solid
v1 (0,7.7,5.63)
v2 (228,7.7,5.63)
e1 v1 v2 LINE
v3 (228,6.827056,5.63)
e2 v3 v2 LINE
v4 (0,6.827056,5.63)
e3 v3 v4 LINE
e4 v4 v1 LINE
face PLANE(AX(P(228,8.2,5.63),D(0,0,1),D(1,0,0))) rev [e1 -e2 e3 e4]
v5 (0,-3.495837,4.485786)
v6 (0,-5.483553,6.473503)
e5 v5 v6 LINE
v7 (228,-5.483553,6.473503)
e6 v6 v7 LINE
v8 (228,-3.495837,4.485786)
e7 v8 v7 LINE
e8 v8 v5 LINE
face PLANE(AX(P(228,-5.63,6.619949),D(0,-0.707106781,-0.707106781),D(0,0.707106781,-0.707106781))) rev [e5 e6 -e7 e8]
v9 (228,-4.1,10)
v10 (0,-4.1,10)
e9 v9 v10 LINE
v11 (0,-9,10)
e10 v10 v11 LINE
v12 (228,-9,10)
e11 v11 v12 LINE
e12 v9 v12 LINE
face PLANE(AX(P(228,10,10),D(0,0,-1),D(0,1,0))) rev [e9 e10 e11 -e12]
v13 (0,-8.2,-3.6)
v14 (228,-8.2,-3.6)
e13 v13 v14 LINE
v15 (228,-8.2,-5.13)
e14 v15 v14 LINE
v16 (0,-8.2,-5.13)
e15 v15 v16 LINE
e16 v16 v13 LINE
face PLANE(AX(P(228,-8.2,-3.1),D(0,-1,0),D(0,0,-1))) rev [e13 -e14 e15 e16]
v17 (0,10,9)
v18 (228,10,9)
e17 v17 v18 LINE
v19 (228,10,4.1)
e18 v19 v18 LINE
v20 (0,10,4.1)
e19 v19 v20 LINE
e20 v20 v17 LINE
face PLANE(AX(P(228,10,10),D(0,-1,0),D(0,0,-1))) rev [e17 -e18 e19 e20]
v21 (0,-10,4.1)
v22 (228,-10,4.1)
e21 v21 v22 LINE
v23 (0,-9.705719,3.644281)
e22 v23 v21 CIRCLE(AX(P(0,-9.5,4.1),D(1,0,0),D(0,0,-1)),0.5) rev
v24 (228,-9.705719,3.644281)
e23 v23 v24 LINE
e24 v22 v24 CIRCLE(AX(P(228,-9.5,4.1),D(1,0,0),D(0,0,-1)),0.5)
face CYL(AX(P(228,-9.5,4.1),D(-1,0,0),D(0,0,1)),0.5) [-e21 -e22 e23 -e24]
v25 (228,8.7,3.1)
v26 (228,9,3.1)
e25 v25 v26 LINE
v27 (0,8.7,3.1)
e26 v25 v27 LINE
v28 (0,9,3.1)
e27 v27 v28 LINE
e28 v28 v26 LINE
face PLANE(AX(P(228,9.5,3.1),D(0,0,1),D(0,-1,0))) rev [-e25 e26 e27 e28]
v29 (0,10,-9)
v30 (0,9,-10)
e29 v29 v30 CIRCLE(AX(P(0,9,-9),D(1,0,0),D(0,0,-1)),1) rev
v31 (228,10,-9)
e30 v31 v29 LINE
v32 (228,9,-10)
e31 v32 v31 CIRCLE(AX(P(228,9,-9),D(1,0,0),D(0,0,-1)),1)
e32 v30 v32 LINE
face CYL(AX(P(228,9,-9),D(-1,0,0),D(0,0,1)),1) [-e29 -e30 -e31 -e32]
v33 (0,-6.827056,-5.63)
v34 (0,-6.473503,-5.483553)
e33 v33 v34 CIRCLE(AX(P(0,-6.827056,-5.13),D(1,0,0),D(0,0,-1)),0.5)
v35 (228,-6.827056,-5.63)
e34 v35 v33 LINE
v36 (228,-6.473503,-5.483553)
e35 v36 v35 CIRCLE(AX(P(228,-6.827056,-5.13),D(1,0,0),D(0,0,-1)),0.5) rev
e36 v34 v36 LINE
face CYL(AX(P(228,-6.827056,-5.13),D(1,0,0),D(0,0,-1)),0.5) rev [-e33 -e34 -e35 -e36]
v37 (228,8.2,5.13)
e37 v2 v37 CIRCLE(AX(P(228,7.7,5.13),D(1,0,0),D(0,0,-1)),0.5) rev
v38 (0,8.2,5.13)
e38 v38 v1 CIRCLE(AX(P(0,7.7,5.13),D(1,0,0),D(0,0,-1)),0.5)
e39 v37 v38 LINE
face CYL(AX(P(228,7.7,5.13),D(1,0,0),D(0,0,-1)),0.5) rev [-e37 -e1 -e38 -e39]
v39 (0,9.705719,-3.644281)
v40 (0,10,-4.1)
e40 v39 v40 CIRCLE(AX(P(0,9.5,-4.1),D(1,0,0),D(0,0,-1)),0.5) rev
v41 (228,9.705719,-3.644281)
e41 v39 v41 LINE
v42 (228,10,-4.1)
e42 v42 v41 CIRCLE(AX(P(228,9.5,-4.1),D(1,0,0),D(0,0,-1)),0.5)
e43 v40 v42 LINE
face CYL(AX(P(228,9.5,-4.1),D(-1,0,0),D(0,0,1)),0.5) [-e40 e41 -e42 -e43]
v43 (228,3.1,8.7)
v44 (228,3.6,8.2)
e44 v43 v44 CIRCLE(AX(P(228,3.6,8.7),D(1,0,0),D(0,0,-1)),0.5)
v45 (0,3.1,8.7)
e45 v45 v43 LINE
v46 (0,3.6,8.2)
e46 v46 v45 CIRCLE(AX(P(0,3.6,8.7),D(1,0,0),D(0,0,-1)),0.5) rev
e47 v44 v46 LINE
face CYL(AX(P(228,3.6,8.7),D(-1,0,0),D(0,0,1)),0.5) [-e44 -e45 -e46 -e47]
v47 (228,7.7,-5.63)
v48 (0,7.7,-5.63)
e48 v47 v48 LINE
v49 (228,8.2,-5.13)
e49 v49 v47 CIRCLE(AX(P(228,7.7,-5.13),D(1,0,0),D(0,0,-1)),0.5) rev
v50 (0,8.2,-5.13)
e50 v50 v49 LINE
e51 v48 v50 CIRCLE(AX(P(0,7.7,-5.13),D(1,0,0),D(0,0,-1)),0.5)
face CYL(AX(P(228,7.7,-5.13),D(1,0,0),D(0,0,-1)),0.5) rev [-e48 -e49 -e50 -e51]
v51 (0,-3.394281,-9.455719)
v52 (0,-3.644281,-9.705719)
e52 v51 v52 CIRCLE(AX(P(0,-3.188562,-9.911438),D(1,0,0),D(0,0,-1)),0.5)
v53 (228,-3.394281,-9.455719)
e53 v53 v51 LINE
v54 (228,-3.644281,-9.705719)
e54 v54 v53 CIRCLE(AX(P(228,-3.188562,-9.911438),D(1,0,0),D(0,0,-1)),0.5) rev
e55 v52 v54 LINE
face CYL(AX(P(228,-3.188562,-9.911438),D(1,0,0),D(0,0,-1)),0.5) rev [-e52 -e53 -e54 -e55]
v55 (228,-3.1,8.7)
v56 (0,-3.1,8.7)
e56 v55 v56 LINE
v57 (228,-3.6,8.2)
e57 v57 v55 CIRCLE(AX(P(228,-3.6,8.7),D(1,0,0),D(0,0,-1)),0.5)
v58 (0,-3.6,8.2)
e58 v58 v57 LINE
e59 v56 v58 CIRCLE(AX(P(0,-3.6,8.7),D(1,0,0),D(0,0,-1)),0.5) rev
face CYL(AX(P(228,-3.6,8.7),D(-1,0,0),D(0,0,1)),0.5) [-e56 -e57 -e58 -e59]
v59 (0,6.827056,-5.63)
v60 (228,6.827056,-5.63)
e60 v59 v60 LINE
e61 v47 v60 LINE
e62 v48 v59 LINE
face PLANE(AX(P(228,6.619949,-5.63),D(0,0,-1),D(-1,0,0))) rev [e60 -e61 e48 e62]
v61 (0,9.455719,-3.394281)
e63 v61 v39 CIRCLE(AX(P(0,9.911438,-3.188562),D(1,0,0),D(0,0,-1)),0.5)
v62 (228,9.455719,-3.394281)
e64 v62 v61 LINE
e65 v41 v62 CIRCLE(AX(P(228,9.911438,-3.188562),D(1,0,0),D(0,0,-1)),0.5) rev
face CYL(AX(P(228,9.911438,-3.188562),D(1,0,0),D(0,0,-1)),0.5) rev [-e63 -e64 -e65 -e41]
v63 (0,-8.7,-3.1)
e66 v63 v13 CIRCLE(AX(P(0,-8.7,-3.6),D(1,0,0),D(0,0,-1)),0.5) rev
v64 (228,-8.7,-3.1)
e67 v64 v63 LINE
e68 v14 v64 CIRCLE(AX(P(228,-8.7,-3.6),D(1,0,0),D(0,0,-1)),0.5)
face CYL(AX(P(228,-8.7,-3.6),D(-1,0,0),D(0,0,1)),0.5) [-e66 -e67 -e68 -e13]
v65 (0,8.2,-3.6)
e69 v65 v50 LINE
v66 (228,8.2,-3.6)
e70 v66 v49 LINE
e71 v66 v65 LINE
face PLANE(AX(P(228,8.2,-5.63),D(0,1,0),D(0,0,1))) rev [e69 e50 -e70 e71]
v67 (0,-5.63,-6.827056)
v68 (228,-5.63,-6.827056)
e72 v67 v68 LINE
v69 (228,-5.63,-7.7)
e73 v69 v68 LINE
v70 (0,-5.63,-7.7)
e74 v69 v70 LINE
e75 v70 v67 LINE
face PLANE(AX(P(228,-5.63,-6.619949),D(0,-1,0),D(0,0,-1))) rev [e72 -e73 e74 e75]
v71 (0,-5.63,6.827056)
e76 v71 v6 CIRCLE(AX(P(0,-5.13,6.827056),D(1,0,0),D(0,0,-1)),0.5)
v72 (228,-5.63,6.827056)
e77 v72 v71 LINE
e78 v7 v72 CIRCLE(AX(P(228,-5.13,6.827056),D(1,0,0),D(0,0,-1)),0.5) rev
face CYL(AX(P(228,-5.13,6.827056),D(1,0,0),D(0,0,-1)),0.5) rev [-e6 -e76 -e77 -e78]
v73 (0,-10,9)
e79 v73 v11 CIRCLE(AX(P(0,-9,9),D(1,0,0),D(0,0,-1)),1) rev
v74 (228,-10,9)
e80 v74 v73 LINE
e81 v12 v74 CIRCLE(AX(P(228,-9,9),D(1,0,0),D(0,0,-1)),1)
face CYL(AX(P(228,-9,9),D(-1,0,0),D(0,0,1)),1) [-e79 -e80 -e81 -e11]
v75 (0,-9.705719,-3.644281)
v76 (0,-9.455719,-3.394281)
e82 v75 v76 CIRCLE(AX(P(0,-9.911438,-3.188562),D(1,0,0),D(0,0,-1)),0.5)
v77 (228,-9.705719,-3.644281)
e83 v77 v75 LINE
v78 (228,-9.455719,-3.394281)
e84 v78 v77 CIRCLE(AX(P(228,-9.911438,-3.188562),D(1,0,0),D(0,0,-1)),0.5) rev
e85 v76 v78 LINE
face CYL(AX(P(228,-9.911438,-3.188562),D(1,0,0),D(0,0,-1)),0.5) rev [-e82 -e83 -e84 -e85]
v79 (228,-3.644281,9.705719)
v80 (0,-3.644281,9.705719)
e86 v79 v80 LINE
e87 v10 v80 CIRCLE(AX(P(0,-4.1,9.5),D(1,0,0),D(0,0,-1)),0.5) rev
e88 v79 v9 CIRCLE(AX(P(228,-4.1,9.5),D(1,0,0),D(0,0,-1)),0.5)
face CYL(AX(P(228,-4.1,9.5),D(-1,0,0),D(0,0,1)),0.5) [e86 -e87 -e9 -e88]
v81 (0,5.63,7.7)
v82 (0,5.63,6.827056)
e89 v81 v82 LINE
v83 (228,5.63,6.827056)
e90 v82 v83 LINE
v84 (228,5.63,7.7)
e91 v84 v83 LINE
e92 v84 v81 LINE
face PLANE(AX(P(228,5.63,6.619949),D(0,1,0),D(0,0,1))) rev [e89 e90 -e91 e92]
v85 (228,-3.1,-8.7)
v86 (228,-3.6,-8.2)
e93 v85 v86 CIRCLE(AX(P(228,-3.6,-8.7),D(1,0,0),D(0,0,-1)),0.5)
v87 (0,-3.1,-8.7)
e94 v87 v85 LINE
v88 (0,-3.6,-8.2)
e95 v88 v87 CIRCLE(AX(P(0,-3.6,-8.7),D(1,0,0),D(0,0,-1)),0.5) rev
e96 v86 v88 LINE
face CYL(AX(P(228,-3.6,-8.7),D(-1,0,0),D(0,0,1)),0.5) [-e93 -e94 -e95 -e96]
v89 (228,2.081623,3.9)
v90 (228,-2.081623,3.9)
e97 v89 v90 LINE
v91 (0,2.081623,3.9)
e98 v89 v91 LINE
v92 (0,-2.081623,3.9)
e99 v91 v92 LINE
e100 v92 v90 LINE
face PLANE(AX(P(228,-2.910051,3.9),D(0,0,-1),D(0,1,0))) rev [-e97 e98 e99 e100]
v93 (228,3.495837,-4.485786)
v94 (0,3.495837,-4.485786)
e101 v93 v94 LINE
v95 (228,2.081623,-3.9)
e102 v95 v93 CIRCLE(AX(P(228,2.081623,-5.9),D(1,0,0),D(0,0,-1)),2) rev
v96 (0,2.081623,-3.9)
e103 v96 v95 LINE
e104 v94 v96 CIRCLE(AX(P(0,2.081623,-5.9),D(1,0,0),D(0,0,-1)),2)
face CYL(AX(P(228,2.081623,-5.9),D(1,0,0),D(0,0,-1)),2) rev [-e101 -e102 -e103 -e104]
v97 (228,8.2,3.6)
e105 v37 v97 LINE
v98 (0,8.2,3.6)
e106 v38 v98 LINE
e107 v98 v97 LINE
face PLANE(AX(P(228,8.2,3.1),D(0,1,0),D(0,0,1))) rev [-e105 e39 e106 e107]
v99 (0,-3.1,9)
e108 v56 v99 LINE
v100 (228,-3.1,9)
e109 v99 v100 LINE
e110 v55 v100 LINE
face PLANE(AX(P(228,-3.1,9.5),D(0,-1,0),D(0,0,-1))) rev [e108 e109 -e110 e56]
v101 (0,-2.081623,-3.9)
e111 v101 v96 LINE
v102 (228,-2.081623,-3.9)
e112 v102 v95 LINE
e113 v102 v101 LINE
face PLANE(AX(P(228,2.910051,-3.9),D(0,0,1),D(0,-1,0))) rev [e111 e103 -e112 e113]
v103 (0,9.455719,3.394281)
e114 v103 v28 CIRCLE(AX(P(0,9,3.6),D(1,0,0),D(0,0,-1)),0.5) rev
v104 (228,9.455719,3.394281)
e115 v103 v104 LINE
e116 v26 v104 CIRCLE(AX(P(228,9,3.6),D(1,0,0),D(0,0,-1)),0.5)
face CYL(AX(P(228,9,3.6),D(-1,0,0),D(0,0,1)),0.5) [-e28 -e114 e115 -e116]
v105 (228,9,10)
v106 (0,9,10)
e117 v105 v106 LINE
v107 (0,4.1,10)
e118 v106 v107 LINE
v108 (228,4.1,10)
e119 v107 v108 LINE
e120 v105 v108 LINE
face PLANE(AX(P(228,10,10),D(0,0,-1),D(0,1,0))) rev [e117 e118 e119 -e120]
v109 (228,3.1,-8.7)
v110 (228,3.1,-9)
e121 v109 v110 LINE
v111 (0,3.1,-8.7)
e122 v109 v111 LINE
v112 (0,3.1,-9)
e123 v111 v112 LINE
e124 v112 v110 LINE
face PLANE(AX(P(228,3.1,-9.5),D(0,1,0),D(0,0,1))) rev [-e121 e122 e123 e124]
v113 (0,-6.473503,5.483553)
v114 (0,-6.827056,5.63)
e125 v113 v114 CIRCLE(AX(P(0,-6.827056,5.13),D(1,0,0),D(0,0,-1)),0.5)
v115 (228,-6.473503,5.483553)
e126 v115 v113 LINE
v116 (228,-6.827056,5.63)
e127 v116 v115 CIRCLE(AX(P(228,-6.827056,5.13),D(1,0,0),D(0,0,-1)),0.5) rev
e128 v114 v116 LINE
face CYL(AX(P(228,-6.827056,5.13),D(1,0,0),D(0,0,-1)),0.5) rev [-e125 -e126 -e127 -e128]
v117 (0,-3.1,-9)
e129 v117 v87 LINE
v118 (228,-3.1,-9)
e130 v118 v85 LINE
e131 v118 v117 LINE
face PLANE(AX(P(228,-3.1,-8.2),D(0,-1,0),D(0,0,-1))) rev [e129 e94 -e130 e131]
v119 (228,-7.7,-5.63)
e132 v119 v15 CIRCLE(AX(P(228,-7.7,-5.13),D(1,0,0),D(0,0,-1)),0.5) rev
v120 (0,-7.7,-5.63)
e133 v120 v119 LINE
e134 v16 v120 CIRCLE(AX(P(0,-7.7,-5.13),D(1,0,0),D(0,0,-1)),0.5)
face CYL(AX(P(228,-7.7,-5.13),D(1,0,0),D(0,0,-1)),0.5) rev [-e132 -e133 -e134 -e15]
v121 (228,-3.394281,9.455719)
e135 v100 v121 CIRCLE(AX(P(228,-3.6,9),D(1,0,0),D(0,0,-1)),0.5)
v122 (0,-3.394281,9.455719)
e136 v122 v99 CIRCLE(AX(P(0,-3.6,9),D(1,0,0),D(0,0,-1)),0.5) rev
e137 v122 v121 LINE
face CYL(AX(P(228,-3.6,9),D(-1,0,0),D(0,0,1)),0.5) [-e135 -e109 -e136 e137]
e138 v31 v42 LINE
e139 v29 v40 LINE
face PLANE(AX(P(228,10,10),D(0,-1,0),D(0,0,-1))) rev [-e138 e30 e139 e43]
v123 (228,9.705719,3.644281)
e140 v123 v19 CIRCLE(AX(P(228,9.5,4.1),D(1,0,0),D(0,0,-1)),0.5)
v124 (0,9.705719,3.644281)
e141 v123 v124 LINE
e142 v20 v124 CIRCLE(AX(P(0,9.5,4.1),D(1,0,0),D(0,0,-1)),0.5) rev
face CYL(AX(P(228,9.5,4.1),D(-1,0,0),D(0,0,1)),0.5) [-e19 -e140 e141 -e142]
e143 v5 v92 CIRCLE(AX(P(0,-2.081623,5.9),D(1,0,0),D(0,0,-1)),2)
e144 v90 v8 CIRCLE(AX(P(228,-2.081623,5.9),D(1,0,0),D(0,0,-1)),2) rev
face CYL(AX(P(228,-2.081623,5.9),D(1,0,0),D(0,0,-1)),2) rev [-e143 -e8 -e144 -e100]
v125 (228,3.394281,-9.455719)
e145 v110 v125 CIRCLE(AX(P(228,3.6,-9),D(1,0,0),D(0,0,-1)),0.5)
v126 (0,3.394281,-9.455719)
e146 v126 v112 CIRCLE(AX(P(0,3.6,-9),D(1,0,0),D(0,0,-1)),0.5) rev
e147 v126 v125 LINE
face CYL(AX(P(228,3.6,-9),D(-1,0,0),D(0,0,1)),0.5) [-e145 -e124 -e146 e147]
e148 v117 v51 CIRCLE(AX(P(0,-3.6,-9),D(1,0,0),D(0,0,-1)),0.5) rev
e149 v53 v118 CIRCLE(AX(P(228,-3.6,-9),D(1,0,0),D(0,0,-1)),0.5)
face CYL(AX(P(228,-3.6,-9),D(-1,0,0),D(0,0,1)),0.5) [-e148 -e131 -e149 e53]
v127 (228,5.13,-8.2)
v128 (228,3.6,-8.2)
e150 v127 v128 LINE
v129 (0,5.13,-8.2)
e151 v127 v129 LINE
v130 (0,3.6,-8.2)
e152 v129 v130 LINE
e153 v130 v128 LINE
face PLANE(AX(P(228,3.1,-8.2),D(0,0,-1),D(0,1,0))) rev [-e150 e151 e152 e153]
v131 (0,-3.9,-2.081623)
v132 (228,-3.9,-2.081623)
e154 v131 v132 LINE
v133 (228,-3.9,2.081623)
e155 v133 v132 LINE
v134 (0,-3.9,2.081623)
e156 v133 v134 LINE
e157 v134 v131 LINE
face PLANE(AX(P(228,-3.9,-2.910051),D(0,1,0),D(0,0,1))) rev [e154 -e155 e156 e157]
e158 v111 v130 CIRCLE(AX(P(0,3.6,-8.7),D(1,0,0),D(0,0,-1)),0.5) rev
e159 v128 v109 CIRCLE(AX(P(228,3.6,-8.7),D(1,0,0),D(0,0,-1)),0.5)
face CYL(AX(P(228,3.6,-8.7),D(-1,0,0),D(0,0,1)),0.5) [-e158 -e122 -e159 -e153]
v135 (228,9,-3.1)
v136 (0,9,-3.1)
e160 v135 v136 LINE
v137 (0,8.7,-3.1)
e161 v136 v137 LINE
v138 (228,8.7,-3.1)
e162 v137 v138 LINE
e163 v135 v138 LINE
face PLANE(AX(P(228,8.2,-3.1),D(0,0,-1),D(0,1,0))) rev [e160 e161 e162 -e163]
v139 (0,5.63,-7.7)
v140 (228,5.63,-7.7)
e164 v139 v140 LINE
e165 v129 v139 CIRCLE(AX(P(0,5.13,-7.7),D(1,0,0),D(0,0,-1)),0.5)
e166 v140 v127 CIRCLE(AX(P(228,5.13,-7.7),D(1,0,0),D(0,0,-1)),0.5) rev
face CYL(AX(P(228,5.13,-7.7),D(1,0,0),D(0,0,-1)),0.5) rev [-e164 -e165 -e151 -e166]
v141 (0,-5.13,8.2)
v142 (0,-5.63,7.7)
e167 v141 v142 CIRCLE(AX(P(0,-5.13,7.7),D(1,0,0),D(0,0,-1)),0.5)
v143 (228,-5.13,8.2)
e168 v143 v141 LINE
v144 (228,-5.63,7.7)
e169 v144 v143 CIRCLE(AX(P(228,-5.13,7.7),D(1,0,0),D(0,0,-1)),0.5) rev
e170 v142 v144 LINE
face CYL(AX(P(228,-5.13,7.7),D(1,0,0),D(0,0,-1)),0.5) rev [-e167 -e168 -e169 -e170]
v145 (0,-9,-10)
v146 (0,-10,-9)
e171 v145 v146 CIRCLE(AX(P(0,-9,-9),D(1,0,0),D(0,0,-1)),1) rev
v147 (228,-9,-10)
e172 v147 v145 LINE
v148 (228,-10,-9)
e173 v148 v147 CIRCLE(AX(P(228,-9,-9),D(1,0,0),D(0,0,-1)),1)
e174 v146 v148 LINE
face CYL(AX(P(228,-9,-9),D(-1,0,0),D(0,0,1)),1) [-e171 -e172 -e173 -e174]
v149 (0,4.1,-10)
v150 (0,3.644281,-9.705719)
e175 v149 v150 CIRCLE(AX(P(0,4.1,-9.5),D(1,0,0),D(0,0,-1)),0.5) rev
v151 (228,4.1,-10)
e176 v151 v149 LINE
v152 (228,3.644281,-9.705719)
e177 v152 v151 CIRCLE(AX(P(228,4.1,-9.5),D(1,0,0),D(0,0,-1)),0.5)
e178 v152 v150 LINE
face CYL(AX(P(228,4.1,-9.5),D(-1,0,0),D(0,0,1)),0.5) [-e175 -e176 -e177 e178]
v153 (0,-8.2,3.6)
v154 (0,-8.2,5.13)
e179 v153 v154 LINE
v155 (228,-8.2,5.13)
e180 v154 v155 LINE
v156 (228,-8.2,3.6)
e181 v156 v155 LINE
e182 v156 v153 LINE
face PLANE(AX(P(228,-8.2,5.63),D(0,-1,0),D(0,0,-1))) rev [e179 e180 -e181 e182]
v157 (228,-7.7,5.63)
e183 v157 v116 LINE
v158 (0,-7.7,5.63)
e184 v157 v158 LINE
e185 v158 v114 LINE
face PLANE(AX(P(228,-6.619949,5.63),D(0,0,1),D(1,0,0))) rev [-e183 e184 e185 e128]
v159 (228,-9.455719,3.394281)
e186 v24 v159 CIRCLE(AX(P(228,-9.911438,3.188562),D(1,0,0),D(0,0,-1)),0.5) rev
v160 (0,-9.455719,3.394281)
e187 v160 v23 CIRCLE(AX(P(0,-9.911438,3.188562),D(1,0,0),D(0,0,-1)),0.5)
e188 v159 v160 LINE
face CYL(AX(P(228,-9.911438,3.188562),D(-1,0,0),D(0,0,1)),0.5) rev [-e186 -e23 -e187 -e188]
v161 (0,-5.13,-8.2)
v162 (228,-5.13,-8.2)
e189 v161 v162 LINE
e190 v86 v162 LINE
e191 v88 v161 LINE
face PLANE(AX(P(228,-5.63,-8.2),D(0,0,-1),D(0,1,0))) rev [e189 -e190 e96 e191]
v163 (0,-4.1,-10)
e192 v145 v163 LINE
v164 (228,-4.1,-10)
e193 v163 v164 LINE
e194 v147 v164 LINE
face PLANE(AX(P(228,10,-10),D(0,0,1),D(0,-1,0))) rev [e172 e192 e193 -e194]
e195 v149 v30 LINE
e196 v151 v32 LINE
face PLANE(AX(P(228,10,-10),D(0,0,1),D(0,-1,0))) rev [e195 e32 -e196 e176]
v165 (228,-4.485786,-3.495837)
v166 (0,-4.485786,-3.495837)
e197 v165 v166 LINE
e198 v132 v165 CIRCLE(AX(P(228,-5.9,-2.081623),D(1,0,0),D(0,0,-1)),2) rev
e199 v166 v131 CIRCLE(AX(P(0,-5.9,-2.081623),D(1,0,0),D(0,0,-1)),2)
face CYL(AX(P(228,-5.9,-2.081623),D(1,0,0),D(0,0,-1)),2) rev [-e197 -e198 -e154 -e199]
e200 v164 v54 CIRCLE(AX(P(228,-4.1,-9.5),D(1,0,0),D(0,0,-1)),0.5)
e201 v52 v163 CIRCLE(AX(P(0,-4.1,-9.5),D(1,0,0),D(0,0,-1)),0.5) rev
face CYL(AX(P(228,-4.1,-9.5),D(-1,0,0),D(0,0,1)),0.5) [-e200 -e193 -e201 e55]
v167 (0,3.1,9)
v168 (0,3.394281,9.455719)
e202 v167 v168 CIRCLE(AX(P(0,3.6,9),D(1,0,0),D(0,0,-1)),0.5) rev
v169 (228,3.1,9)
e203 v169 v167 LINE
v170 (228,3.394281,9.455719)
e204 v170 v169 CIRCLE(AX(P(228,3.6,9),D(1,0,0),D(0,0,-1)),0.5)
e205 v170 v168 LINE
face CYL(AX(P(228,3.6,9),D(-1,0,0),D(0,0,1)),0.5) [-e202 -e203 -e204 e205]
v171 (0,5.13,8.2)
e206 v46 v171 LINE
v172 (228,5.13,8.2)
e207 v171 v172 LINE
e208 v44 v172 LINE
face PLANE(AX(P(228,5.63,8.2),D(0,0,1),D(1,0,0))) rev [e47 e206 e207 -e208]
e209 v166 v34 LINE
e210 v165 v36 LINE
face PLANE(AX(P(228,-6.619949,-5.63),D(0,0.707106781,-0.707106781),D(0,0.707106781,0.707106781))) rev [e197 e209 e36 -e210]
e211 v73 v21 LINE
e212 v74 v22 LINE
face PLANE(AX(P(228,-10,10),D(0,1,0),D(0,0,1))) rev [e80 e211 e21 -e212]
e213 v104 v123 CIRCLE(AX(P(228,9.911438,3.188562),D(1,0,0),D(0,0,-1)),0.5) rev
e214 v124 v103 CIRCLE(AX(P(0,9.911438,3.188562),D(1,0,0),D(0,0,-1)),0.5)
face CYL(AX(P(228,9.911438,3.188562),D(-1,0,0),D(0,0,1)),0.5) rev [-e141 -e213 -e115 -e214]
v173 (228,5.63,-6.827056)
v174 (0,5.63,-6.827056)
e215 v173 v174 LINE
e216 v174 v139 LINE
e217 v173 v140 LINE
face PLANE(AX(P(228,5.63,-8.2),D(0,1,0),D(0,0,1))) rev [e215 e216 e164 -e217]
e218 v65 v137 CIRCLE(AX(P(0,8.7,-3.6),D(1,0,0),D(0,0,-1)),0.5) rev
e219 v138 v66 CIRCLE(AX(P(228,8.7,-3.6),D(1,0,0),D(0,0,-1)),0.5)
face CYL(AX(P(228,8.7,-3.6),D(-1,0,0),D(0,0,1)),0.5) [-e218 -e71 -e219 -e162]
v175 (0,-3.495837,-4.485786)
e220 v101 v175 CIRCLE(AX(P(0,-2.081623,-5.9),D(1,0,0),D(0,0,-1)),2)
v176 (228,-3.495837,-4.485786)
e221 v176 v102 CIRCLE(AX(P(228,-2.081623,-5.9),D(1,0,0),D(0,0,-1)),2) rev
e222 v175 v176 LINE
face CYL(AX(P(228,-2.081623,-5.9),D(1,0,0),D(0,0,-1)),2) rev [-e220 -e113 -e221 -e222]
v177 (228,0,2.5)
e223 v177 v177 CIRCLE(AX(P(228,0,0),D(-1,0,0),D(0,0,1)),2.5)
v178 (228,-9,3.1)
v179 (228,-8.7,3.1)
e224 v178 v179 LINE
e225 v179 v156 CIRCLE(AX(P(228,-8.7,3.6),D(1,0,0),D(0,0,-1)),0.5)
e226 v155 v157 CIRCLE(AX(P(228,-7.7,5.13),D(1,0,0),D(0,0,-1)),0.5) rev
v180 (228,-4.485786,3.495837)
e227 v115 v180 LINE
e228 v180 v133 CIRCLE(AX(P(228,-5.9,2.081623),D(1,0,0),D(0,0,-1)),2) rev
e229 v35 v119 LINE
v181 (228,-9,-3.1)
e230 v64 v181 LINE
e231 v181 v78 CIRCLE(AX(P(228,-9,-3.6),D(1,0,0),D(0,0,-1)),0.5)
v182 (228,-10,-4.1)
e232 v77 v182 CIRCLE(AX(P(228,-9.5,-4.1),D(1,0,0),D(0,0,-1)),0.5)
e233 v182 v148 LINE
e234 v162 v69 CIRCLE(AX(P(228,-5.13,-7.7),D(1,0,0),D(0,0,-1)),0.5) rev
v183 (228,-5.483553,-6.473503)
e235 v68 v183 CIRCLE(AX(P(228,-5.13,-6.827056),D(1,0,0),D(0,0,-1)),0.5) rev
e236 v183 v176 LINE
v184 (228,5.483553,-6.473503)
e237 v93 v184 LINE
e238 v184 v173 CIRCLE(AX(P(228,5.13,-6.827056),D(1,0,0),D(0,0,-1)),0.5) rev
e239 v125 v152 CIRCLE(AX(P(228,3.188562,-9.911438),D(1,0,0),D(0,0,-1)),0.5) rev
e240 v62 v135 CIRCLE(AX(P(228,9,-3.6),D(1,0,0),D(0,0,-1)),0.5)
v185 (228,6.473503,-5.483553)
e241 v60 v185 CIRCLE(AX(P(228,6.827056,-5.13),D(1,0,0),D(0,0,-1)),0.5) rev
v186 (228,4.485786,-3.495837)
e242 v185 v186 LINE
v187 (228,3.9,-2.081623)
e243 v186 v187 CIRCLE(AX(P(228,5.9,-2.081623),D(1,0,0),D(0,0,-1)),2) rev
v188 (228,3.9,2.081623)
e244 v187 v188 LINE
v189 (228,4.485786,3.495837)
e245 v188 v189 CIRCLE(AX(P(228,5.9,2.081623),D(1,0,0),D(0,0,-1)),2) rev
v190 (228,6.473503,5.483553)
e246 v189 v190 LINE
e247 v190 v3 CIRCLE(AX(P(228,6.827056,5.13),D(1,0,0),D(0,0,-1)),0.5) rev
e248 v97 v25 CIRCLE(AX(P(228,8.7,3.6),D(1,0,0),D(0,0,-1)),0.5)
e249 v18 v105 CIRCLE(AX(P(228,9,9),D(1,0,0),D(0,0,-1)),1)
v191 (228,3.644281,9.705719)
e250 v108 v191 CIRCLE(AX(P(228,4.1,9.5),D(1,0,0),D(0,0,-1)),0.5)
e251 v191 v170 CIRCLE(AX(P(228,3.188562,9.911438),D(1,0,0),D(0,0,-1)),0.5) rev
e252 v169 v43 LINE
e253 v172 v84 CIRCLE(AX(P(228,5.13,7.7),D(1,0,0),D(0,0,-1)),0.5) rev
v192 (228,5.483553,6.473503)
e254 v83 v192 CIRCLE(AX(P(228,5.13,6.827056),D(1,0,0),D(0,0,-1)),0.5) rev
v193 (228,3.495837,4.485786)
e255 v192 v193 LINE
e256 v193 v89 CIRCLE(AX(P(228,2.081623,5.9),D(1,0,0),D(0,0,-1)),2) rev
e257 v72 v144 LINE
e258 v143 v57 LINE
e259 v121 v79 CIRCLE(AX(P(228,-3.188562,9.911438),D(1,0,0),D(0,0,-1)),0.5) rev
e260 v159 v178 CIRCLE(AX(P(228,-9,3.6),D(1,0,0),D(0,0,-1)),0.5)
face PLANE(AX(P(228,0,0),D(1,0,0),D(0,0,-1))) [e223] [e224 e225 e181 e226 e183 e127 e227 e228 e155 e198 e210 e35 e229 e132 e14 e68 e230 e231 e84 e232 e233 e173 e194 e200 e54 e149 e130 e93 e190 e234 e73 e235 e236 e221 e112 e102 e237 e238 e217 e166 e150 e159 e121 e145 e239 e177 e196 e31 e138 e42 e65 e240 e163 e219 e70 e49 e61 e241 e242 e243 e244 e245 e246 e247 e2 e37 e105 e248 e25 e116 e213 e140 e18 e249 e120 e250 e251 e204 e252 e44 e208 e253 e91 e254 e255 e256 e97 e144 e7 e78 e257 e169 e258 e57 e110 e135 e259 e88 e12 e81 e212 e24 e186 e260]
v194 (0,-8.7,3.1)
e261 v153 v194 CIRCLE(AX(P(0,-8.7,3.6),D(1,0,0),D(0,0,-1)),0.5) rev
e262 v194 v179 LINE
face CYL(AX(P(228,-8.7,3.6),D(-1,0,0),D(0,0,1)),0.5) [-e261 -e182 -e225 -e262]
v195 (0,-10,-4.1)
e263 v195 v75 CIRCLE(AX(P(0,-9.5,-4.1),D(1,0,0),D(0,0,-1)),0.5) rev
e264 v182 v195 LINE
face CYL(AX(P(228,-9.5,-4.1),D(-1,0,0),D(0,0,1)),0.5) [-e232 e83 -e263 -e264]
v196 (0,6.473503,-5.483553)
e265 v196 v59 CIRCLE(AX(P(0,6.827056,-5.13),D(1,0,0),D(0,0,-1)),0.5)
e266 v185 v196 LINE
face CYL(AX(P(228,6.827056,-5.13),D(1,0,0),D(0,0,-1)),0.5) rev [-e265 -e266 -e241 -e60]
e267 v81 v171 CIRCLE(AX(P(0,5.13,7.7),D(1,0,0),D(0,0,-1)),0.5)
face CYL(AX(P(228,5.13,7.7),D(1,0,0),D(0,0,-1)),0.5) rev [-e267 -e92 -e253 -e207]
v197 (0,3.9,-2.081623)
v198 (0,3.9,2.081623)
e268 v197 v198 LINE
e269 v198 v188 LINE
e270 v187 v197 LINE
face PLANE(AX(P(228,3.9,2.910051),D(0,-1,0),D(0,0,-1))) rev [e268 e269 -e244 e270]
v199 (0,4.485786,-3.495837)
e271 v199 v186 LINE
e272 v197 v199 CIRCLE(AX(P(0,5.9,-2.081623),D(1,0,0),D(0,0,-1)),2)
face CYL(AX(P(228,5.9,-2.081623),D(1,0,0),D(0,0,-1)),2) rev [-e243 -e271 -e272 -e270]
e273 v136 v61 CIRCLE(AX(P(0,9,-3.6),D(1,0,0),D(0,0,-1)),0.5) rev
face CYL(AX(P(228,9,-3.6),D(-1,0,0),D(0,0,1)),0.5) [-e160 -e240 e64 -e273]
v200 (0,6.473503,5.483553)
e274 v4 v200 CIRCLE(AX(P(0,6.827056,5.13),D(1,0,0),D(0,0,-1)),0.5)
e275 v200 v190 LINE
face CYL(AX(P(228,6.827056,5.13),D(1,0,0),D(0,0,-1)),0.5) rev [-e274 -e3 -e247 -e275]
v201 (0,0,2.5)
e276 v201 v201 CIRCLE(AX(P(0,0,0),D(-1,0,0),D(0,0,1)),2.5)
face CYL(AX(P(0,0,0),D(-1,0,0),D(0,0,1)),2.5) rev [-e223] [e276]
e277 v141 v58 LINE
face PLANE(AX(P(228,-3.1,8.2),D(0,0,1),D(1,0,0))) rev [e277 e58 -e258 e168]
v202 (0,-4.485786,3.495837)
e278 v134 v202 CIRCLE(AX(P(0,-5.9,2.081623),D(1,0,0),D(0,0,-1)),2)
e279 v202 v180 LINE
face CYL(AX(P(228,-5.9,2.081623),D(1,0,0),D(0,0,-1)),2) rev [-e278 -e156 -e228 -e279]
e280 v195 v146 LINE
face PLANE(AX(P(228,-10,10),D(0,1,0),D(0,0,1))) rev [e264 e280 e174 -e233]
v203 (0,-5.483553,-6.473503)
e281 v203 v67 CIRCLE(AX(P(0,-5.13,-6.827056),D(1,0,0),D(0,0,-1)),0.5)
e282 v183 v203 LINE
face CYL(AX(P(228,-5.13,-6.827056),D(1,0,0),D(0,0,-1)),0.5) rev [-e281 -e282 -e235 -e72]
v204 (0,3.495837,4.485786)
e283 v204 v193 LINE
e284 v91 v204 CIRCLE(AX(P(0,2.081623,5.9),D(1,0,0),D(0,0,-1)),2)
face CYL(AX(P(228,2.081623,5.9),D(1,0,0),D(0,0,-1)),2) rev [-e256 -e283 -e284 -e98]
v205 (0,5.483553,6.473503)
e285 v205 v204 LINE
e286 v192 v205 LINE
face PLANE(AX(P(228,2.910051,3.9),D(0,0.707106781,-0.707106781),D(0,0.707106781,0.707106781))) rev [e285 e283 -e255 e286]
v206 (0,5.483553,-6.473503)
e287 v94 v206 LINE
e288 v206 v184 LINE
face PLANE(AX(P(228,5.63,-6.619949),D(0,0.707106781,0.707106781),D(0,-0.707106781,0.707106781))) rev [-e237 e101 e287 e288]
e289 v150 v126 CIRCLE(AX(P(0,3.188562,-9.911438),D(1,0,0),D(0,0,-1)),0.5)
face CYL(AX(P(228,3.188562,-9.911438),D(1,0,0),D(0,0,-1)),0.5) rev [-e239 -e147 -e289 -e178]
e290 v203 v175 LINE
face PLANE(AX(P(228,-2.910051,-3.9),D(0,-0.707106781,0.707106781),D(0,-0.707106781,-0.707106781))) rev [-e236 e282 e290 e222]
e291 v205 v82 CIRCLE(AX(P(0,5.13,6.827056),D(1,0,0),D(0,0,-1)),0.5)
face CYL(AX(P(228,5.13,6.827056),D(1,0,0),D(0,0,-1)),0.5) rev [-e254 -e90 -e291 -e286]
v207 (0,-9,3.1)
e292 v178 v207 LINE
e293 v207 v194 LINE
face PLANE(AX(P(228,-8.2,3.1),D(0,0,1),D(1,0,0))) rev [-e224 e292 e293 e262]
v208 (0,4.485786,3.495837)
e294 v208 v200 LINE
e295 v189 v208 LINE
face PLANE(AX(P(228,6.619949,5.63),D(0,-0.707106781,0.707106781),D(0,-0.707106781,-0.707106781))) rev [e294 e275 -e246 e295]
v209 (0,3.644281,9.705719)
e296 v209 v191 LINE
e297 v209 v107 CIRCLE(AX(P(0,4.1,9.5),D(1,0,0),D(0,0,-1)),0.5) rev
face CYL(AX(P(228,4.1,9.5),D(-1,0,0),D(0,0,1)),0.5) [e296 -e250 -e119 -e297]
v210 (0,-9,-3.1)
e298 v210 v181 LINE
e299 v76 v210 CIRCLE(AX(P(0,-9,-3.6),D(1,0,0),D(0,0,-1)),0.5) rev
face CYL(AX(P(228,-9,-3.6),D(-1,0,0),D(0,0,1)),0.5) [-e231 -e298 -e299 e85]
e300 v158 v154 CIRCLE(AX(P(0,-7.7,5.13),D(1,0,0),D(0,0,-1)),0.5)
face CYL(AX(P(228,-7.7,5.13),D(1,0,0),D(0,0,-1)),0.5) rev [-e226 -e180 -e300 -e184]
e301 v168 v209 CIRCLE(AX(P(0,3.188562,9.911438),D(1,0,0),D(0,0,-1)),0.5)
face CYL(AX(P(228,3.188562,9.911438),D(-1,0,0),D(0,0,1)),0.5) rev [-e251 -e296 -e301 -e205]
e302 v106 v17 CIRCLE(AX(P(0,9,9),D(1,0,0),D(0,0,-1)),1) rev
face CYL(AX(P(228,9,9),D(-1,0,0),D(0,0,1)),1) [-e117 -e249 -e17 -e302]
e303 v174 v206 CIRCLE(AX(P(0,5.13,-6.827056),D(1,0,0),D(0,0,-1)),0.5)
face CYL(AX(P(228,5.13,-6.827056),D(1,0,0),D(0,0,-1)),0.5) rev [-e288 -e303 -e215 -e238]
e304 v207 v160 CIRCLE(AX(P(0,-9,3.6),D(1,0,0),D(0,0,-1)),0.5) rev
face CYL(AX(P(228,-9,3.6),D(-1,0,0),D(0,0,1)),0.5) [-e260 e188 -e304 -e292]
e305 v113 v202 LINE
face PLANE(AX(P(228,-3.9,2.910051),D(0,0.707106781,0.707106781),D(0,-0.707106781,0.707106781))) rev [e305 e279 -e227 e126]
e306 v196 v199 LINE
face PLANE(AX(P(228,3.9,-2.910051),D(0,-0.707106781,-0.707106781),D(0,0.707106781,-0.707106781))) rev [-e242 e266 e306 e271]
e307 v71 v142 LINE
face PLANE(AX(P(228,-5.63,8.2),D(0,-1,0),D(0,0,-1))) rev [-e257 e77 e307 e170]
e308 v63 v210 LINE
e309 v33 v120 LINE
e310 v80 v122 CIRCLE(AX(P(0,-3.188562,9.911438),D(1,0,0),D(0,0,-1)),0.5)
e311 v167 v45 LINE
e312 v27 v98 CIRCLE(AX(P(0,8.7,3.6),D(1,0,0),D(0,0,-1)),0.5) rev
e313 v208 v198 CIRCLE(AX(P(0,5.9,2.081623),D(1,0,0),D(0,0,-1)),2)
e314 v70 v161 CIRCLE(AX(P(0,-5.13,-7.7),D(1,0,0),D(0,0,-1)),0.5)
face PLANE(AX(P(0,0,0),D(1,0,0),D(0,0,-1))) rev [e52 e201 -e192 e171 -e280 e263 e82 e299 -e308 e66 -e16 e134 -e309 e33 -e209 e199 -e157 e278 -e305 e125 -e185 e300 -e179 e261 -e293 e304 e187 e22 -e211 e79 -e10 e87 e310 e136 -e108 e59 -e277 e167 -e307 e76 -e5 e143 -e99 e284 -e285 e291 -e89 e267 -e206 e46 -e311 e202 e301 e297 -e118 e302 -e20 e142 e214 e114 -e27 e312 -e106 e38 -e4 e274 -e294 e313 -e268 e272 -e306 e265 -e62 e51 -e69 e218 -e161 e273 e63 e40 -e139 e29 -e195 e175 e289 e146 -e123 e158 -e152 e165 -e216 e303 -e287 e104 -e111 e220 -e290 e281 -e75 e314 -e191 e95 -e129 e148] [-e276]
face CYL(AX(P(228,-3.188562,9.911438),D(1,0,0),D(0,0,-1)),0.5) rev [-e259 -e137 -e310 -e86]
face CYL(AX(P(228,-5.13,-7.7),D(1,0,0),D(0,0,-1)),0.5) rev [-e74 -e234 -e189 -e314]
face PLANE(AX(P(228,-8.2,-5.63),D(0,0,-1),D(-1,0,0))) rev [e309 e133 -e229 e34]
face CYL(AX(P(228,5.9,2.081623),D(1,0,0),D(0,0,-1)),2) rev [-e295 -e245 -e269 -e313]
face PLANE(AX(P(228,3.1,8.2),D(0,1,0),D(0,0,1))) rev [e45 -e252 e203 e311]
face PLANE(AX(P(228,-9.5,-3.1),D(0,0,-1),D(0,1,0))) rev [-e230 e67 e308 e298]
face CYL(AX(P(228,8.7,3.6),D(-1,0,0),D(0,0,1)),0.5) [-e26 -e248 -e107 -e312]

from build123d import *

# Parameters (mm, degrees)
SKETCH1_W                = 20
SKETCH1_H                = 20
BOSS_EXTRUDE1_DEPTH      = 228
FILLET1_R                = 1
CUT_EXTRUDE1_DEPTH       = 229.438175444
F_5_0_5_DIAMETER_HOLE1_D = 5
FILLET2_R                = 2
FILLET3_R                = 0.5
FILLET4_R                = 0.5
FILLET5_R                = 0.5


with BuildPart() as part:
    # Sketch1 → Boss-Extrude1 (new body)
    with BuildSketch(Plane(origin=(0, 0, 0), x_dir=(0, 0, -1), z_dir=(1, 0, 0))):
        Rectangle(SKETCH1_W, SKETCH1_H)
    extrude(amount=BOSS_EXTRUDE1_DEPTH)

    # Fillet1
    fillet1_edges = [part.edges().sort_by_distance(p)[0] for p in [
        (114, 10, 10),
        (114, 10, -10),
        (114, -10, -10),
        (114, -10, 10),
    ]]
    fillet(fillet1_edges, radius=FILLET1_R)

    # Sketch3 → Cut-Extrude1 (cut, through all)
    with BuildSketch(Plane.ZY):
        Polygon((-3.6, 10), (3.6, 10), (3.6, 9.5), (3.1, 9.5), (3.1, 8.2), (5.63, 8.2), (5.63, 6.619949494), (2.910050506, 3.9), (-2.910050506, 3.9), (-5.63, 6.619949494), (-5.63, 8.2), (-3.1, 8.2), (-3.1, 9.5), (-3.6, 9.5), align=None)
        Polygon((10, 3.6), (10, -3.6), (9.5, -3.6), (9.5, -3.1), (8.2, -3.1), (8.2, -5.63), (6.619949494, -5.63), (3.9, -2.910050506), (3.9, 2.910050506), (6.619949494, 5.63), (8.2, 5.63), (8.2, 3.1), (9.5, 3.1), (9.5, 3.6), align=None)
        Polygon((3.6, -10), (-3.6, -10), (-3.6, -9.5), (-3.1, -9.5), (-3.1, -8.2), (-5.63, -8.2), (-5.63, -6.619949494), (-2.910050506, -3.9), (2.910050506, -3.9), (5.63, -6.619949494), (5.63, -8.2), (3.1, -8.2), (3.1, -9.5), (3.6, -9.5), align=None)
        Polygon((-10, -3.6), (-10, 3.6), (-9.5, 3.6), (-9.5, 3.1), (-8.2, 3.1), (-8.2, 5.63), (-6.619949494, 5.63), (-3.9, 2.910050506), (-3.9, -2.910050506), (-6.619949494, -5.63), (-8.2, -5.63), (-8.2, -3.1), (-9.5, -3.1), (-9.5, -3.6), align=None)
    extrude(amount=-CUT_EXTRUDE1_DEPTH, mode=Mode.SUBTRACT)

    # Ø5.0 (5) Diameter Hole1 (through all)
    with Locations(Plane.ZY):
        with Locations((0, 0)):
            Hole(F_5_0_5_DIAMETER_HOLE1_D / 2)

    # Fillet2
    fillet2_edges = [part.edges().sort_by_distance(p)[0] for p in [
        (114, -3.9, -2.910050506),
        (114, -3.9, 2.910050506),
        (114, 2.910050506, -3.9),
        (114, -2.910050506, -3.9),
        (114, -2.910050506, 3.9),
        (114, 2.910050506, 3.9),
        (114, 3.9, 2.910050506),
        (114, 3.9, -2.910050506),
    ]]
    fillet(fillet2_edges, radius=FILLET2_R)

    # Fillet3
    fillet3_edges = [part.edges().sort_by_distance(p)[0] for p in [
        (114, 3.6, -10),
        (114, 3.1, -9.5),
        (114, 3.1, -8.2),
        (114, 5.63, -8.2),
        (114, 5.63, -6.619949494),
        (114, 3.6, 10),
        (114, 3.1, 9.5),
        (114, 3.1, 8.2),
        (114, 5.63, 8.2),
        (114, 5.63, 6.619949494),
        (114, 6.619949494, 5.63),
        (114, 8.2, 5.63),
        (114, 8.2, 3.1),
        (114, 9.5, 3.1),
        (114, 10, 3.6),
        (114, 9.5, -3.1),
        (114, 10, -3.6),
        (114, 8.2, -3.1),
        (114, 8.2, -5.63),
        (114, 6.619949494, -5.63),
    ]]
    fillet(fillet3_edges, radius=FILLET3_R - 0.0001)  # a hair under: the kernel refuses the full size

    # Fillet4
    fillet4_edges = [part.edges().sort_by_distance(p)[0] for p in [
        (114, -3.6, 10),
        (114, -3.1, 9.5),
        (114, -3.1, 8.2),
        (114, -5.63, 8.2),
        (114, -5.63, 6.619949494),
        (114, -6.619949494, 5.63),
        (114, -8.2, 5.63),
        (114, -8.2, 3.1),
        (114, -10, 3.6),
        (114, -9.5, 3.1),
        (114, -10, -3.6),
        (114, -9.5, -3.1),
        (114, -8.2, -3.1),
        (114, -8.2, -5.63),
        (114, -6.619949494, -5.63),
        (114, -5.63, -6.619949494),
        (114, -5.63, -8.2),
        (114, -3.1, -8.2),
        (114, -3.1, -9.5),
        (114, -3.6, -10),
    ]]
    fillet(fillet4_edges, radius=FILLET4_R - 0.0001)  # a hair under: the kernel refuses the full size

    # Fillet5
    fillet5_edges = [part.edges().sort_by_distance(p)[0] for p in [
        (114, 3.6, 9.5),
        (114, 9.5, 3.6),
        (114, 9.5, -3.6),
        (114, 3.6, -9.5),
        (114, -3.6, 9.5),
        (114, -9.5, 3.6),
        (114, -9.5, -3.6),
        (114, -3.6, -9.5),
    ]]
    fillet(fillet5_edges, radius=FILLET5_R)


solid = part.part
